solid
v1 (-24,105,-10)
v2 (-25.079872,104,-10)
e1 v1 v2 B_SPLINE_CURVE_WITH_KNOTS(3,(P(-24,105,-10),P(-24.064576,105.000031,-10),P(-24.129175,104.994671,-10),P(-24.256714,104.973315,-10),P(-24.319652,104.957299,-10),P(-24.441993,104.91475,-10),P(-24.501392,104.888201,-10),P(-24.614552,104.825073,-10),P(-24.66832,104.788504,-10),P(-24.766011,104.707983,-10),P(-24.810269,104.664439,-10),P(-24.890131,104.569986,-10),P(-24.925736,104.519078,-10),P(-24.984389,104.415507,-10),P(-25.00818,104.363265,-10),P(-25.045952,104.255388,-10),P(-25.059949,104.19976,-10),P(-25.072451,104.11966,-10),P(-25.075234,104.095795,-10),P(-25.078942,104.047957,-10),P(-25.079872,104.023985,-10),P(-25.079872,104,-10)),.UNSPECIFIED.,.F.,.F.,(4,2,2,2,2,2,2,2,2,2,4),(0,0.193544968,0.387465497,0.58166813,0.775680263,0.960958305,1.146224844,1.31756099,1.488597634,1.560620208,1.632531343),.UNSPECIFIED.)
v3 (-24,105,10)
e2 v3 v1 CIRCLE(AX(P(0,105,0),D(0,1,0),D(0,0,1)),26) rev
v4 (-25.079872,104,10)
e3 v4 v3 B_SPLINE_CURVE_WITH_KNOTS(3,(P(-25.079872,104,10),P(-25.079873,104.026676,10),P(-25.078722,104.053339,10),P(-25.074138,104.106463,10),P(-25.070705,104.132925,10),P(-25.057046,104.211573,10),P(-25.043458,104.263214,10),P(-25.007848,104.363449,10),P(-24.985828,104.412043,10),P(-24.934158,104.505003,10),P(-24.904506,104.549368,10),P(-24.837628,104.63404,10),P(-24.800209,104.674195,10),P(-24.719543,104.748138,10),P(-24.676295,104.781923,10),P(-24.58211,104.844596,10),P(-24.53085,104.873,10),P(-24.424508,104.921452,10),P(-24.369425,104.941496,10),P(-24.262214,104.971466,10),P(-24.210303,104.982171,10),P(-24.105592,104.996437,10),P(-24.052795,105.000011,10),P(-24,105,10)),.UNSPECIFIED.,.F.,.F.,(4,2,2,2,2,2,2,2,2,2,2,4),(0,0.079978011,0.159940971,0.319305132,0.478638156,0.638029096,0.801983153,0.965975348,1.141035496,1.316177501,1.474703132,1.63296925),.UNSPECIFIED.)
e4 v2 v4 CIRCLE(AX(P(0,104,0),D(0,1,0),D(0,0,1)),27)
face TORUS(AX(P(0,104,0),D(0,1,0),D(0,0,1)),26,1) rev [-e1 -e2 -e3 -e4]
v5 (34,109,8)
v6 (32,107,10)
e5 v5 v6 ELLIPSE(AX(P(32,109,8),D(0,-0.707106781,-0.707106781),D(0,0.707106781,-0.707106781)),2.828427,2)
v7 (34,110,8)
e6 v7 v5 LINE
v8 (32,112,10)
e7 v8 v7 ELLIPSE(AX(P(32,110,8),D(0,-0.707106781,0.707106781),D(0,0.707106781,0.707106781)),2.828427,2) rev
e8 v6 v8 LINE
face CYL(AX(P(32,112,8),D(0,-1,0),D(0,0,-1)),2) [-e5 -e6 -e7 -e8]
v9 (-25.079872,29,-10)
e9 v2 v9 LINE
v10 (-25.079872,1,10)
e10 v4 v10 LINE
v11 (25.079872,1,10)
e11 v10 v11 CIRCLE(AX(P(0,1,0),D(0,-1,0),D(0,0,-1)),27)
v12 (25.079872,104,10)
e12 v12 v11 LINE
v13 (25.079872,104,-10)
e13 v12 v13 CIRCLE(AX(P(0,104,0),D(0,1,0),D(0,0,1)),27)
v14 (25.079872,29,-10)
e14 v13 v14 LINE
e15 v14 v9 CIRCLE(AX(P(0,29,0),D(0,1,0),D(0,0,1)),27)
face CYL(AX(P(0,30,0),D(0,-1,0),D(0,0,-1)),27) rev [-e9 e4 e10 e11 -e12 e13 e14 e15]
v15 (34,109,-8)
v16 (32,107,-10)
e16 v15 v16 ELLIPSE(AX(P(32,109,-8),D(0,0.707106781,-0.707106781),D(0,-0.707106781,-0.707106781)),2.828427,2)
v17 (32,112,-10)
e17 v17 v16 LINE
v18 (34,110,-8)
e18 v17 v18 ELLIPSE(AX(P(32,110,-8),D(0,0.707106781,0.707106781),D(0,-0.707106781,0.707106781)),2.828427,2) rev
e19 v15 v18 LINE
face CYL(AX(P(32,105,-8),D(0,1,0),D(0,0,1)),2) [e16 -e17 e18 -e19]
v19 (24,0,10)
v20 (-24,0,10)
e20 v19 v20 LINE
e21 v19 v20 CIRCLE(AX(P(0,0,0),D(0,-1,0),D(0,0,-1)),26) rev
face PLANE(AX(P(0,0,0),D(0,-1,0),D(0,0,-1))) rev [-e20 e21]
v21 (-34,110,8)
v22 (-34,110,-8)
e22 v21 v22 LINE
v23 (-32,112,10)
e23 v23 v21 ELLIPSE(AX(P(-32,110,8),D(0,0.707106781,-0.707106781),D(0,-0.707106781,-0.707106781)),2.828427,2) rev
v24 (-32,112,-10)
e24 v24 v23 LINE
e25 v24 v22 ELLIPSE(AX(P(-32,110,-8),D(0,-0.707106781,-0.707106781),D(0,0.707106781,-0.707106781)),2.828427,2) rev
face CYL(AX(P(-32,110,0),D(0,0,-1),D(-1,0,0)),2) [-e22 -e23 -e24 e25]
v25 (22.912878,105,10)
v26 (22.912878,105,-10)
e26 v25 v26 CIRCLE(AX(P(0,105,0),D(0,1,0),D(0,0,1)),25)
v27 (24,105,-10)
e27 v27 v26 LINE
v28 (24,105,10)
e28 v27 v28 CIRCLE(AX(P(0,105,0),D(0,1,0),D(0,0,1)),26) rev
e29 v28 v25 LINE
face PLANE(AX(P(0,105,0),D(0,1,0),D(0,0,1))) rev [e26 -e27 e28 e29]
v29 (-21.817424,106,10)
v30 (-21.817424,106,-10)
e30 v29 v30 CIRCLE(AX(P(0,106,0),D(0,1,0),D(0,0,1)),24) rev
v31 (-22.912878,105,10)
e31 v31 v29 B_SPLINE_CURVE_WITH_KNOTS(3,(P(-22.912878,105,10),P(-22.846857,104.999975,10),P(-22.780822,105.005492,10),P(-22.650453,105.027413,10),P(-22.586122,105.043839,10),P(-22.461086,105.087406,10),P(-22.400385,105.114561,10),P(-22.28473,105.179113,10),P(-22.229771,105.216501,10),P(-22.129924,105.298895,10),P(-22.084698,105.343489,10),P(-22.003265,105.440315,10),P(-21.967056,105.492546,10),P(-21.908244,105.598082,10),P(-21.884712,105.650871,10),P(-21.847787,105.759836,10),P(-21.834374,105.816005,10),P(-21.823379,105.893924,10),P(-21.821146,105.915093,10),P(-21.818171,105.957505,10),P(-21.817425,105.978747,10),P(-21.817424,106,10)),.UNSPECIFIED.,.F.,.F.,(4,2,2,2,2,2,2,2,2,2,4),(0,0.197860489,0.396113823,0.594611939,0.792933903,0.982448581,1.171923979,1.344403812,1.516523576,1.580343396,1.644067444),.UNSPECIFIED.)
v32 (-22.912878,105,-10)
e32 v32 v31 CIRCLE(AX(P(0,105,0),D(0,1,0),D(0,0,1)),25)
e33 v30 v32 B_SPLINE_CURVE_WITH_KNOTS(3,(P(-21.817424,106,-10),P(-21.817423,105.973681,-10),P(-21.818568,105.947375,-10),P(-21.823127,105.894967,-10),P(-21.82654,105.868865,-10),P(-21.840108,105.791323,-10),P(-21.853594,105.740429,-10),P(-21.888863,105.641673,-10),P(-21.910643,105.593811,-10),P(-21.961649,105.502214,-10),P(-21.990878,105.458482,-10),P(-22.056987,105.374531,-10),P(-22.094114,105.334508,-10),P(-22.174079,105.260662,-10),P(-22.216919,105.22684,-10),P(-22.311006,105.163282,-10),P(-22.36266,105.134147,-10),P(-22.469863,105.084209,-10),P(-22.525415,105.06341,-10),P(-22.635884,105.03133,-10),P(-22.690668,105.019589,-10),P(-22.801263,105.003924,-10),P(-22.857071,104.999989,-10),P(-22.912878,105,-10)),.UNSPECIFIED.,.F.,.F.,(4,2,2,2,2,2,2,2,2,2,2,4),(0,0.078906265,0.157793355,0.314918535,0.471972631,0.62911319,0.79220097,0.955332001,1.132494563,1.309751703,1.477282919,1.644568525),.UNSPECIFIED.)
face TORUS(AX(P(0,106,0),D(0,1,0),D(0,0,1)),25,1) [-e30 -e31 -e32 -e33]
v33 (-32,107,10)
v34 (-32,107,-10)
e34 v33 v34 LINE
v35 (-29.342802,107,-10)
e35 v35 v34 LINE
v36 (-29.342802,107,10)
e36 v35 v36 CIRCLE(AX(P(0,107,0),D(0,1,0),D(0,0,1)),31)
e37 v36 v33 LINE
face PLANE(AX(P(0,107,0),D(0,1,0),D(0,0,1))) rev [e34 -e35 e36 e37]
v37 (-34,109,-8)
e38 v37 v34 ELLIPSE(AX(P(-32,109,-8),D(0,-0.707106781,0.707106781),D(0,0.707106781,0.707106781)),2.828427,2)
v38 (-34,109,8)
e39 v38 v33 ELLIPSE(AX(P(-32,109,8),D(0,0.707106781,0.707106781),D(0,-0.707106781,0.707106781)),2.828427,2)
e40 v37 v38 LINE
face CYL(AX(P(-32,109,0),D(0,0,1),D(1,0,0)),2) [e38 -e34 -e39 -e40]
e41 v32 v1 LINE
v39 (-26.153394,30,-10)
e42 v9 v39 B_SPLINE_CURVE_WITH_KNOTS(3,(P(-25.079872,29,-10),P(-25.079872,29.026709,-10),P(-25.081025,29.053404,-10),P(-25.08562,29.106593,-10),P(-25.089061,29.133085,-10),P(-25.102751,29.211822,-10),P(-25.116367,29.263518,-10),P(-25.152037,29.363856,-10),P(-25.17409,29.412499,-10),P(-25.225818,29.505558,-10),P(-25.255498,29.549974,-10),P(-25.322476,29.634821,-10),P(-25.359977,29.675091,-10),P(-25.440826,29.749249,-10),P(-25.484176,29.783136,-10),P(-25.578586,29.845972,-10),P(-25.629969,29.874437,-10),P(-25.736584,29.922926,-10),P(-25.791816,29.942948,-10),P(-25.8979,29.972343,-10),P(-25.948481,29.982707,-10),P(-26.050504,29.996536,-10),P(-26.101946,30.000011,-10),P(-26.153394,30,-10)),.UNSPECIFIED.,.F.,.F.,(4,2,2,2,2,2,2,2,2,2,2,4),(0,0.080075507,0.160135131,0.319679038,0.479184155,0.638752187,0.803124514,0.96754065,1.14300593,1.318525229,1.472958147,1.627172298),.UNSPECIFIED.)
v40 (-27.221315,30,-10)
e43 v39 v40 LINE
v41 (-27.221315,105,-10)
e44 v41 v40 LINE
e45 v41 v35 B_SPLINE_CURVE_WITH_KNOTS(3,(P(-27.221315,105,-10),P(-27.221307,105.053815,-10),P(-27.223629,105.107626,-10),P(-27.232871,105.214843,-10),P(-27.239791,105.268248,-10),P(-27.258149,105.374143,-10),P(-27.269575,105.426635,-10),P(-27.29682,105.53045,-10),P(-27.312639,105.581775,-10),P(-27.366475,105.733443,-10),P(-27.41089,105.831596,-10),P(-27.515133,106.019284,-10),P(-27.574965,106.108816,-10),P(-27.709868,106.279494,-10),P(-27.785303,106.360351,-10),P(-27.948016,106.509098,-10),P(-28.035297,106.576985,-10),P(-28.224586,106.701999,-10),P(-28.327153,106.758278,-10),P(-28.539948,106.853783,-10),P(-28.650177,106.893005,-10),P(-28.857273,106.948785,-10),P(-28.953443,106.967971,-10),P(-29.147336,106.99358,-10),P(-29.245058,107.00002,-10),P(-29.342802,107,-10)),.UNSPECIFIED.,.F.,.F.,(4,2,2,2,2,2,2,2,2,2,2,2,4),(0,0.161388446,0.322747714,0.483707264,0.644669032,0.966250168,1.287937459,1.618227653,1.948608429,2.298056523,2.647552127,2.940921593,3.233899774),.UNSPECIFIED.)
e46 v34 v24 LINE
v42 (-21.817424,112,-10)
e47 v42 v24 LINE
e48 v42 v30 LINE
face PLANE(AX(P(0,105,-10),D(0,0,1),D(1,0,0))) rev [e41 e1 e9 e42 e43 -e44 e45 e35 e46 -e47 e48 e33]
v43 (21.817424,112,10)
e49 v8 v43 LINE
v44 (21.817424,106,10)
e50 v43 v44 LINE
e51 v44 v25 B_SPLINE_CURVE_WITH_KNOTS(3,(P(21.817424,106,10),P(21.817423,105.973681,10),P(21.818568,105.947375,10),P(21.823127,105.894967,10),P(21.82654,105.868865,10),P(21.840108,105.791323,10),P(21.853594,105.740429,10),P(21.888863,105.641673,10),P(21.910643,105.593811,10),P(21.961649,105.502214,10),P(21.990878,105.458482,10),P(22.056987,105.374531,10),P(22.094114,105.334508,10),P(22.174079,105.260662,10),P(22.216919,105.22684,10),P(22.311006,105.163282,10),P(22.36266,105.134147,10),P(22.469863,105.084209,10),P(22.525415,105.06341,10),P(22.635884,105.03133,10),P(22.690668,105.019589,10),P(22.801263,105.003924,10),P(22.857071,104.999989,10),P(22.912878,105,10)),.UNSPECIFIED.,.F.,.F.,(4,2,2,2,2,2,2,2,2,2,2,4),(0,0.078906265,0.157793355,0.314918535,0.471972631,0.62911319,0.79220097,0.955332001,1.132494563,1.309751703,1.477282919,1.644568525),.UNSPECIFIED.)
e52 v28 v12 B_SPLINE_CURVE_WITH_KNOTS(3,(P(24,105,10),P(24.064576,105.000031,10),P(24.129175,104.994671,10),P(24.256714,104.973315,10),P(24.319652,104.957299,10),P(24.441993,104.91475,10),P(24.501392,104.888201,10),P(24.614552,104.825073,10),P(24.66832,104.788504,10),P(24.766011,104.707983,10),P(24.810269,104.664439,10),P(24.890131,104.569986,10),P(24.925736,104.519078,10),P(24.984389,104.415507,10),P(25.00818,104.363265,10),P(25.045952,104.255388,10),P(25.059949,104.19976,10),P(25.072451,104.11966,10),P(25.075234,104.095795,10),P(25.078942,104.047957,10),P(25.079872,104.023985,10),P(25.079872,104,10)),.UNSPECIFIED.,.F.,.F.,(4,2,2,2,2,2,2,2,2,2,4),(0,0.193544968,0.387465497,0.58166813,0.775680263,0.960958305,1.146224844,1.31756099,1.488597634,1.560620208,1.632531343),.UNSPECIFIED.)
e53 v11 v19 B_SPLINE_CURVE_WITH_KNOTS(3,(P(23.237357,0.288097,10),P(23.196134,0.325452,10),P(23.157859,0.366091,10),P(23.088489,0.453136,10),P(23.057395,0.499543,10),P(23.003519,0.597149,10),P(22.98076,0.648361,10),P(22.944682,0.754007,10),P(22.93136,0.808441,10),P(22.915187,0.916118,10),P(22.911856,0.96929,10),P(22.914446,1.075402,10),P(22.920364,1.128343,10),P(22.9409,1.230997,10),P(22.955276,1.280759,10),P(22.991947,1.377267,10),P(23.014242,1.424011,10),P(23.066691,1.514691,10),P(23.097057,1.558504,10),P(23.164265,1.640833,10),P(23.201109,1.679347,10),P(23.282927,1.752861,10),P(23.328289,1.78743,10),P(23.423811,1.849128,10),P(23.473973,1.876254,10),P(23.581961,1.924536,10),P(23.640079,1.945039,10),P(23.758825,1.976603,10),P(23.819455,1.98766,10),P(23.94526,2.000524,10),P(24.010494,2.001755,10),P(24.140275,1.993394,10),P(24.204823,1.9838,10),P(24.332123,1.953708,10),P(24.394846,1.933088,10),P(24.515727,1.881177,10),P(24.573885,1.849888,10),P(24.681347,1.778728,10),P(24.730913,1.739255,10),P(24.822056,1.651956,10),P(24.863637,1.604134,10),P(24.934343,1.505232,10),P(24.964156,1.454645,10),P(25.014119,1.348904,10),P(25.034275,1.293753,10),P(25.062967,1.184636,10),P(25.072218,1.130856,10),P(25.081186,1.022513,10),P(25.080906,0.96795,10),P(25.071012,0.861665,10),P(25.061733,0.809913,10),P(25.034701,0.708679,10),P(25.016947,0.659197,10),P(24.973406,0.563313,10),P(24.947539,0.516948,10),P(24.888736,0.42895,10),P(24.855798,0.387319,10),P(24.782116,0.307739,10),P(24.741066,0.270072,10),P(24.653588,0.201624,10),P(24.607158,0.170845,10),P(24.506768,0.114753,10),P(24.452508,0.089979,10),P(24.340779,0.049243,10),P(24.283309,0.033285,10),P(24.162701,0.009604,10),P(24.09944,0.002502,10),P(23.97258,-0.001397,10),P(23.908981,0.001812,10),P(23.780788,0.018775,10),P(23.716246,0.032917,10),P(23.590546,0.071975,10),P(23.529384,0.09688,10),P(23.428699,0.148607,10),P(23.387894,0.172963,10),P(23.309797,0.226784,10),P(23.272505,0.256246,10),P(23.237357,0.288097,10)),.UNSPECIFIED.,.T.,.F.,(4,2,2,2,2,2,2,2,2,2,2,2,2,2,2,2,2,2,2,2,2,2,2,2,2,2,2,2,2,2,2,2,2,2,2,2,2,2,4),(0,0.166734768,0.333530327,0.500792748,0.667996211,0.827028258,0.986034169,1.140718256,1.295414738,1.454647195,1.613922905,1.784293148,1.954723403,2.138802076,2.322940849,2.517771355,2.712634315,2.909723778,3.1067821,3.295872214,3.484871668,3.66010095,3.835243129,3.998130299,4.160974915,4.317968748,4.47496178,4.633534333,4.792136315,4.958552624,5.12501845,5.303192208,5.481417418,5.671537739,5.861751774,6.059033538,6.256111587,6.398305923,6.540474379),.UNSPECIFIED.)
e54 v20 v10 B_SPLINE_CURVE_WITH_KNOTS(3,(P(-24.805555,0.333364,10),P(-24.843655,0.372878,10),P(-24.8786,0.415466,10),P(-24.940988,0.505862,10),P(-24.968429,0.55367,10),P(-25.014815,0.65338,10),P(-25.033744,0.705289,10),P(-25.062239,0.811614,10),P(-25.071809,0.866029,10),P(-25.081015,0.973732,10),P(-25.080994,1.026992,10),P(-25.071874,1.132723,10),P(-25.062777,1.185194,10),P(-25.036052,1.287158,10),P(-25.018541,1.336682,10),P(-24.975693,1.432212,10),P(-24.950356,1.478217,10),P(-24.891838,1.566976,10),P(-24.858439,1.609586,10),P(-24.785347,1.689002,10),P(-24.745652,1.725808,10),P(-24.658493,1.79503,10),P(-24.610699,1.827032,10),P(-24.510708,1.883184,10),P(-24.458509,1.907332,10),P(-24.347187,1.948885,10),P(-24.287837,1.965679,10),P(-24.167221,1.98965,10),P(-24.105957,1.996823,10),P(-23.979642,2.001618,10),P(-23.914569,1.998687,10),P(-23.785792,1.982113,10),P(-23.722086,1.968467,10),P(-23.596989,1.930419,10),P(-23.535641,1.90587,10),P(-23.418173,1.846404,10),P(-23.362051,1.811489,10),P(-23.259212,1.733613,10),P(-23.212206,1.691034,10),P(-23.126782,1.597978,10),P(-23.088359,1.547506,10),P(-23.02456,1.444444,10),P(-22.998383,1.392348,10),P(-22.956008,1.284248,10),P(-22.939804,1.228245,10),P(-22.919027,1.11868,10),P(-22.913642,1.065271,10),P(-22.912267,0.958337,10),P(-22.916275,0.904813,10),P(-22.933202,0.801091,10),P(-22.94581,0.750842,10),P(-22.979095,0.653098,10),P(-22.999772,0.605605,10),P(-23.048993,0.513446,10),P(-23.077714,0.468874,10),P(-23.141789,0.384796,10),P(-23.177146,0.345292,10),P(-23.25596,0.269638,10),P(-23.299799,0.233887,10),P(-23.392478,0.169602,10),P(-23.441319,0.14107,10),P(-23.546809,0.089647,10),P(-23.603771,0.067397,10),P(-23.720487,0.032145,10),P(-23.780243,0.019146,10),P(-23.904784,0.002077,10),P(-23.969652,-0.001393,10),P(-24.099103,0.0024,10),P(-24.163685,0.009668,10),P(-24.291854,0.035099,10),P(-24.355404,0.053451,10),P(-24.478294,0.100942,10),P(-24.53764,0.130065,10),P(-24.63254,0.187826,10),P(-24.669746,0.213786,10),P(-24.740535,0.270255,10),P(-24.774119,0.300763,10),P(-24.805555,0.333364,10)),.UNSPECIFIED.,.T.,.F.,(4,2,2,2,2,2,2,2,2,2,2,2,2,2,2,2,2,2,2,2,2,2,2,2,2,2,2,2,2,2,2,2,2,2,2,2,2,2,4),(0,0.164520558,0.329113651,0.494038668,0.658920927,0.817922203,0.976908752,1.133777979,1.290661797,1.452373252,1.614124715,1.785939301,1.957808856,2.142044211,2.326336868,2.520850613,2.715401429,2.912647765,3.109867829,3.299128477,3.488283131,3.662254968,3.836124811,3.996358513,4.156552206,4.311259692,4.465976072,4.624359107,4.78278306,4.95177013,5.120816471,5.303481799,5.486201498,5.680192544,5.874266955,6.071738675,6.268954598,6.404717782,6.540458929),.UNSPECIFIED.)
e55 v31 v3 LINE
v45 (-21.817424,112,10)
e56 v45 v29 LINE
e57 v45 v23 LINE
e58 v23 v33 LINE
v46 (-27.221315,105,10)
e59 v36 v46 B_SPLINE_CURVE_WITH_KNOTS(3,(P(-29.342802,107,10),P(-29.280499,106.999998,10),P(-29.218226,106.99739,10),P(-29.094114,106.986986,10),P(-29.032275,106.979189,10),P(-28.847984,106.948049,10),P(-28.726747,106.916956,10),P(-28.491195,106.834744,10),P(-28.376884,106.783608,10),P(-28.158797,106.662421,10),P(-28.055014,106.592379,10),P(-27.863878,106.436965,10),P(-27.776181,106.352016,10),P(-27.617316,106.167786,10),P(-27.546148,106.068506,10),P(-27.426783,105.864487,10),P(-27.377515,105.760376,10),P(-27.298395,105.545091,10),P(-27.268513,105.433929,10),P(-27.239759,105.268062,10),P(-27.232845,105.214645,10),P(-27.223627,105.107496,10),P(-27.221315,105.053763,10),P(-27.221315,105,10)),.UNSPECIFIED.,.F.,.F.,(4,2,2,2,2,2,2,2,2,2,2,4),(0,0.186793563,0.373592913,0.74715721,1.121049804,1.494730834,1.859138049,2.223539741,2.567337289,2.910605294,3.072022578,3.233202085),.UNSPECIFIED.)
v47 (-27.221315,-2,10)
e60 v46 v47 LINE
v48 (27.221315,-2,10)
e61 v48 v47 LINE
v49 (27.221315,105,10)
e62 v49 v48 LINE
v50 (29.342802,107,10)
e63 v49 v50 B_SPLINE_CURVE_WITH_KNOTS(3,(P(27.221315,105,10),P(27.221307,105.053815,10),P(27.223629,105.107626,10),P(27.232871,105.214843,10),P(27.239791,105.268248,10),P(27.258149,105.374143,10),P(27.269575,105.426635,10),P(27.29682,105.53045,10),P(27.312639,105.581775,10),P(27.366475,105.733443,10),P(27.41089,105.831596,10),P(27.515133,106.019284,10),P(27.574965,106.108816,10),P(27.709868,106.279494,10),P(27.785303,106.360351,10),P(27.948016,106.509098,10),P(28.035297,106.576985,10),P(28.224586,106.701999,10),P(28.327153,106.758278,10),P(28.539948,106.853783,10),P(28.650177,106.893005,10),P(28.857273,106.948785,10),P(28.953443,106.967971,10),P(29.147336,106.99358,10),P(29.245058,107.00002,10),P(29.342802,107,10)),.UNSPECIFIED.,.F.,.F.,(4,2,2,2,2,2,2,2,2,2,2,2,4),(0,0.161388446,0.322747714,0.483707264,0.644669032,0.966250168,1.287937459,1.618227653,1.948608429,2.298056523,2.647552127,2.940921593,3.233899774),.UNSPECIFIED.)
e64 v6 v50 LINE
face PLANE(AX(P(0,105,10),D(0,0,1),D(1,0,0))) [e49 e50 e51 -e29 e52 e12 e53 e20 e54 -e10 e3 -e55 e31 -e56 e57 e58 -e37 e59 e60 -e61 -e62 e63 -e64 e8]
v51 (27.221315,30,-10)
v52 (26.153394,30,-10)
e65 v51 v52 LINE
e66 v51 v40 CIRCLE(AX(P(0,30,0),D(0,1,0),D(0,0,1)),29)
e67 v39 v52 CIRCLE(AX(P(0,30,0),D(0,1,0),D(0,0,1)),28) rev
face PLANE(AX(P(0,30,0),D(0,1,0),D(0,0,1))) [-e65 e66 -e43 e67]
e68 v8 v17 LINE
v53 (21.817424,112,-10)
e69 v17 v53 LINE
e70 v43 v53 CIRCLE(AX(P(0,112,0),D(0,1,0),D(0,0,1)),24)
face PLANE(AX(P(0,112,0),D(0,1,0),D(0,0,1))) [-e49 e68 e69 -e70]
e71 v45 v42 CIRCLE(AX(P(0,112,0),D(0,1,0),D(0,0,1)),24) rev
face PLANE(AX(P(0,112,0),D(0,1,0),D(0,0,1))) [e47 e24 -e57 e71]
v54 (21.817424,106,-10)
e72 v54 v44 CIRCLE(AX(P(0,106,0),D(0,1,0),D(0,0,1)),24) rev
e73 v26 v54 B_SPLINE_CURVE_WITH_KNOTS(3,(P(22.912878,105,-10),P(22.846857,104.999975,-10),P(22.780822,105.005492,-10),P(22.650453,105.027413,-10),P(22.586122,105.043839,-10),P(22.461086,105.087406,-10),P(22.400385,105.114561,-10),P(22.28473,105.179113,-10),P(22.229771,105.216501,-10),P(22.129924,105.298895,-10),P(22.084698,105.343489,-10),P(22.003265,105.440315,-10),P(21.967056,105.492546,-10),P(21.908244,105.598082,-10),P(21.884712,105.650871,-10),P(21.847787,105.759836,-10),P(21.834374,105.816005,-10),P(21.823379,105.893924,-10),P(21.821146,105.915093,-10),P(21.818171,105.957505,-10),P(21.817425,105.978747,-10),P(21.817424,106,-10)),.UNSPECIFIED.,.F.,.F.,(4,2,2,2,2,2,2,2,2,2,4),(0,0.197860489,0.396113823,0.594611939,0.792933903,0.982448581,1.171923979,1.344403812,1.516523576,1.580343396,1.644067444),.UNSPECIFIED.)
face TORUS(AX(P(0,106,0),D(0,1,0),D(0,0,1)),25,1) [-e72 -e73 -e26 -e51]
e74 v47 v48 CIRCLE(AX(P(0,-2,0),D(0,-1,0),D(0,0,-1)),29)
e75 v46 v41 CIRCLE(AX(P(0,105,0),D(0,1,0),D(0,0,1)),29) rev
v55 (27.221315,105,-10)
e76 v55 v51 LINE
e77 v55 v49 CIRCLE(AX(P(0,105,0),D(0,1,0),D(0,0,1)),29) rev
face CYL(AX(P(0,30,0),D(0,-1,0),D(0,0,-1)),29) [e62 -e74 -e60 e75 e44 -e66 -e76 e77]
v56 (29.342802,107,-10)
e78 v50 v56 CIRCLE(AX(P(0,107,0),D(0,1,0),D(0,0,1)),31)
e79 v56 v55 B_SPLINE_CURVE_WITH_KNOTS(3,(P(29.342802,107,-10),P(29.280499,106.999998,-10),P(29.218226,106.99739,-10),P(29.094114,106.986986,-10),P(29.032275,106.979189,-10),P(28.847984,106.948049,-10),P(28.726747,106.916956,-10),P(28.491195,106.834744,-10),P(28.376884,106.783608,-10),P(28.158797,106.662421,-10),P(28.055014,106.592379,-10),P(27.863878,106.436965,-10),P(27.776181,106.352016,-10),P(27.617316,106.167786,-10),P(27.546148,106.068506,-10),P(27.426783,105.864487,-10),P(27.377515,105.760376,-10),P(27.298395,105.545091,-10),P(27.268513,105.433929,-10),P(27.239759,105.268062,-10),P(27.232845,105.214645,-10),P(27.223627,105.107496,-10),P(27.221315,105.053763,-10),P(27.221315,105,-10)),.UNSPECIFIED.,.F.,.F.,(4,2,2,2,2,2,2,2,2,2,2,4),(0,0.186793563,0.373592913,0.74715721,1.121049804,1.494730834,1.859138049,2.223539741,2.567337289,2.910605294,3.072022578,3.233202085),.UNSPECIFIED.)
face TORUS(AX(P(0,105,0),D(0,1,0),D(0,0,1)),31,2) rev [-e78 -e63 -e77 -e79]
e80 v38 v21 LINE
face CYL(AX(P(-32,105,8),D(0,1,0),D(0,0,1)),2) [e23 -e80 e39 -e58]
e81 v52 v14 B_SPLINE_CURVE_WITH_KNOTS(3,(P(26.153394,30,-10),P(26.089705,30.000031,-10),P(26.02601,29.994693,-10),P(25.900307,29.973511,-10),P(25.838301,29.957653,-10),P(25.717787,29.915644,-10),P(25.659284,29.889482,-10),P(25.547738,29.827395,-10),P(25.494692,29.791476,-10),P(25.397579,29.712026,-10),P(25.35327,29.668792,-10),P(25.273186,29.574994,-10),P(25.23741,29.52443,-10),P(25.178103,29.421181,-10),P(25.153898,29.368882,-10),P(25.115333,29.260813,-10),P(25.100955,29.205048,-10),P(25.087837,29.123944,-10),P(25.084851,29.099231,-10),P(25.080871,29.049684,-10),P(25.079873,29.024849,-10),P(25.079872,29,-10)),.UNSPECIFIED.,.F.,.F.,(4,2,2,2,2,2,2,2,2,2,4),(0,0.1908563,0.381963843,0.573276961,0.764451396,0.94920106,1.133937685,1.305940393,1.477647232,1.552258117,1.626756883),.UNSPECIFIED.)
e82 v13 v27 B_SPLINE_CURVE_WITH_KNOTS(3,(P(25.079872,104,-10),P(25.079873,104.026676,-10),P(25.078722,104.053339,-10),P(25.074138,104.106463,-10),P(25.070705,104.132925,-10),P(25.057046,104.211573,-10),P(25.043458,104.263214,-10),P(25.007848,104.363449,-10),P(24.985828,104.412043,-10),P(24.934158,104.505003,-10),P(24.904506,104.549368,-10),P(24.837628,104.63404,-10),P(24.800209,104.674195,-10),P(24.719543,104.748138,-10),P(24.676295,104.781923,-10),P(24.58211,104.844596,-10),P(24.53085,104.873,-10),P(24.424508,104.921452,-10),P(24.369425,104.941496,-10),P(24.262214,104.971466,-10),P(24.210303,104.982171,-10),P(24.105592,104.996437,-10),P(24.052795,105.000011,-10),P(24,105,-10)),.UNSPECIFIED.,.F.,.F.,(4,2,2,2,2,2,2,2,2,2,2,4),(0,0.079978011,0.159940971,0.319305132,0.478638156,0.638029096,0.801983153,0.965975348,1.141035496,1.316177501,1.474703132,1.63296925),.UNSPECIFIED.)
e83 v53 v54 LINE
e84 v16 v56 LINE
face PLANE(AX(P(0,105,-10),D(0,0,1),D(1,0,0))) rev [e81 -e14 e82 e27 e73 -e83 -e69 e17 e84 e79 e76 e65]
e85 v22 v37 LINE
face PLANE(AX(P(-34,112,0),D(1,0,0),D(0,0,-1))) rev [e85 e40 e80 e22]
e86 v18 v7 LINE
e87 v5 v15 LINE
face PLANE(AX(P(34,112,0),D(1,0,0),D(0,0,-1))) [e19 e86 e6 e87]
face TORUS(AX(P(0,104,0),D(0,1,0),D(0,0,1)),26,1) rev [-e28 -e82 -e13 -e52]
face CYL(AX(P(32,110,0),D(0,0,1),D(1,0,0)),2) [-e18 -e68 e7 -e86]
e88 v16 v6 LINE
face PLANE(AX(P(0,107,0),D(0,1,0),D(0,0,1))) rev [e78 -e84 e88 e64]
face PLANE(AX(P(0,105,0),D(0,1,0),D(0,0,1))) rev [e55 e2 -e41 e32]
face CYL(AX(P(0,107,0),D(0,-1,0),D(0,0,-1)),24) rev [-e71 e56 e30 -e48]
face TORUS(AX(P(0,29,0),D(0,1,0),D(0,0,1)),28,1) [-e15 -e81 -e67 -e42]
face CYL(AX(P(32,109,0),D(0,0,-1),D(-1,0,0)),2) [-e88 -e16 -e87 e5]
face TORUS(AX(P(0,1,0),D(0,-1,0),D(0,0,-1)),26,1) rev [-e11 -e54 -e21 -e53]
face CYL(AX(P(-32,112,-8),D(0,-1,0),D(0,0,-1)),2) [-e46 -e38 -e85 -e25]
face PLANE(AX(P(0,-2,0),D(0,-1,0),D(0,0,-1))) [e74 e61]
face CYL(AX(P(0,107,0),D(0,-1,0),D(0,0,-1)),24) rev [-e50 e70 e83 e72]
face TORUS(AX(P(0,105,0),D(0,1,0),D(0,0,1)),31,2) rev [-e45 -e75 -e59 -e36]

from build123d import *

# Parameters (mm, degrees)
SKETCH1_R           = 29
SKETCH1_R_2         = 27
BOSS_EXTRUDE1_DEPTH = 30
BOSS_EXTRUDE2_START = 2
SKETCH2_R           = 29
BOSS_EXTRUDE2_DEPTH = 2
BOSS_EXTRUDE3_DEPTH = 75
BOSS_EXTRUDE5_DEPTH = 2
FILLET2_R           = 1
BOSS_EXTRUDE6_DEPTH = 5
FILLET3_R           = 2
SKETCH7_W           = 70
SKETCH7_H           = 116
CUT_EXTRUDE1_DEPTH  = 19


with BuildPart() as part:
    # Sketch1 → Boss-Extrude1 (new body)
    with BuildSketch(Plane(origin=(0, 0, 0), x_dir=(1, 0, 0), z_dir=(0, 1, 0))):
        with Locations(Location((0, 0, 0), (0, 0, 270))):
            Circle(SKETCH1_R)
        with Locations(Location((0, 0, 0), (0, 0, 270))):
            Circle(SKETCH1_R_2, mode=Mode.SUBTRACT)
    extrude(amount=BOSS_EXTRUDE1_DEPTH)

    # Sketch2 → Boss-Extrude2 (add)
    with BuildSketch(Plane.XZ.offset(BOSS_EXTRUDE2_START)):
        with Locations(Location((0, 0, 0), (0, 0, 270))):
            Circle(SKETCH2_R)
    extrude(amount=-BOSS_EXTRUDE2_DEPTH)

    # Sketch3 → Boss-Extrude3 (add)
    with BuildSketch(Plane(origin=(0, 30, 0), x_dir=(1, 0, 0), z_dir=(0, 1, 0))):
        with BuildLine():
            ThreePointArc((27.221315178, -10), (29, 0), (27.221315178, 10))
            Line((27.221315178, 10), (25.079872408, 10))
            ThreePointArc((25.079872408, 10), (27, 0), (25.079872408, -10))
            Line((25.079872408, -10), (27.221315178, -10))
        make_face()
        with BuildLine():
            Line((-25.079872408, 10), (-27.221315178, 10))
            ThreePointArc((-27.221315178, 10), (-29, 0), (-27.221315178, -10))
            Line((-27.221315178, -10), (-25.079872408, -10))
            ThreePointArc((-25.079872408, -10), (-27, 0), (-25.079872408, 10))
        make_face()
    extrude(amount=BOSS_EXTRUDE3_DEPTH)

    # Sketch4 → Boss-Extrude5 (add)
    with BuildSketch(Plane(origin=(0, 105, 0), x_dir=(1, 0, 0), z_dir=(0, 1, 0))):
        with BuildLine():
            ThreePointArc((25.079872408, -10), (27, 0), (25.079872408, 10))
            Line((25.079872408, 10), (21.817424229, 10))
            ThreePointArc((21.817424229, 10), (23.448008247, 5.117705467), (24, 0))
            ThreePointArc((24, 0), (23.448008247, -5.117705467), (21.817424229, -10))
            Line((21.817424229, -10), (25.079872408, -10))
        make_face()
        with BuildLine():
            ThreePointArc((25.079872408, 10), (27, 0), (25.079872408, -10))
            Line((25.079872408, -10), (27.221315178, -10))
            ThreePointArc((27.221315178, -10), (29, 0), (27.221315178, 10))
            Line((27.221315178, 10), (25.079872408, 10))
        make_face()
        with BuildLine():
            Line((-21.817424229, 10), (-27.221315178, 10))
            ThreePointArc((-27.221315178, 10), (-28.551866312, 5.078477145), (-29, 3.9e-08))
            ThreePointArc((-29, 3.9e-08), (-28.551866318, -5.078477108), (-27.221315178, -10))
            Line((-27.221315178, -10), (-21.817424229, -10))
            ThreePointArc((-21.817424229, -10), (-24, 0), (-21.817424229, 10))
        make_face()
    extrude(amount=BOSS_EXTRUDE5_DEPTH)

    # Fillet2
    # the kernel refuses this fillet: 1 mm, written as the material it adds along each edge
    with BuildSketch(Plane(origin=(0, 105, 0), x_dir=(0.8906566474761322, 0, -0.4546765183144792), z_dir=(-0.4546765183144792, 0, -0.8906566474761322))) as fillet2_piece_1_section:
        with BuildLine():
            CenterArc((27 - FILLET2_R, FILLET2_R), FILLET2_R, 270, 90)
            Line((27 - FILLET2_R, 0), (27, 0))
            Line((27, 0), (27, FILLET2_R))
        make_face()
    fillet2_piece_1 = revolve(axis=Axis((0, 105, 0), (0, -1, 0)), revolution_arc=54.088245562, mode=Mode.PRIVATE)
    fillet2_piece_1 = split(fillet2_piece_1, bisect_by=Plane(origin=(26.719378233, 104.719378233, 10), z_dir=(0, 0, -1)), keep=Keep.TOP, mode=Mode.PRIVATE)
    fillet2_piece_1 = split(fillet2_piece_1, bisect_by=Plane(origin=(26.719378233, 104.719378233, -10), z_dir=(0, 0, 1)), keep=Keep.TOP, mode=Mode.PRIVATE)
    add(fillet2_piece_1)
    with BuildSketch(Plane(origin=(0, 105, 0), x_dir=(-0.890656647476122, 0, 0.4546765183144991), z_dir=(0.4546765183144991, 0, 0.890656647476122))) as fillet2_piece_2_section:
        with BuildLine():
            CenterArc((27 - FILLET2_R, FILLET2_R), FILLET2_R, 270, 90)
            Line((27 - FILLET2_R, 0), (27, 0))
            Line((27, 0), (27, FILLET2_R))
        make_face()
    fillet2_piece_2 = revolve(axis=Axis((0, 105, 0), (0, -1, 0)), revolution_arc=54.088245562, mode=Mode.PRIVATE)
    fillet2_piece_2 = split(fillet2_piece_2, bisect_by=Plane(origin=(-26.719378233, 104.719378233, 10), z_dir=(0, 0, -1)), keep=Keep.TOP, mode=Mode.PRIVATE)
    fillet2_piece_2 = split(fillet2_piece_2, bisect_by=Plane(origin=(-26.719378233, 104.719378233, -10), z_dir=(0, 0, 1)), keep=Keep.TOP, mode=Mode.PRIVATE)
    add(fillet2_piece_2)
    with BuildSketch(Plane(origin=(0, 0, 0), x_dir=(0, 0, 1), z_dir=(-1, 0, 0))) as fillet2_piece_3:
        with BuildLine():
            CenterArc((27 - FILLET2_R, FILLET2_R), FILLET2_R, 270, 90)
            Line((27 - FILLET2_R, 0), (27, 0))
            Line((27, 0), (27, FILLET2_R))
        make_face()
    revolve(axis=Axis((0, 0, 0), (0, 1, 0)))
    # the kernel refuses this fillet: 1 mm, written as the material it takes off along each edge
    with BuildSketch(Plane(origin=(0, 30, 0), x_dir=(0.9591739549871109, 0, -0.28281676766836794), z_dir=(0.28281676766836794, 0, 0.9591739549871109))) as fillet2_2_piece_1_section:
        with BuildLine():
            CenterArc((27 + FILLET2_R, -FILLET2_R), FILLET2_R, 90, 90)
            Line((27, -FILLET2_R), (27, 0))
            Line((27, 0), (27 + FILLET2_R, 0))
        make_face()
    fillet2_2_piece_1 = revolve(axis=Axis((0, 30, 0), (0, 1, 0)), revolution_arc=147.143219234, mode=Mode.PRIVATE)
    fillet2_2_piece_1 = split(fillet2_2_piece_1, bisect_by=Plane(origin=(0, 29.725140897, -10), z_dir=(0, 0, -1)), keep=Keep.TOP, mode=Mode.PRIVATE)
    add(fillet2_2_piece_1, mode=Mode.SUBTRACT)
    with BuildSketch(Plane(origin=(0, 30, 0), x_dir=(-0.9591557890892681, 0, 0.28287837007545047), z_dir=(-0.28287837007545047, 0, -0.9591557890892681))) as fillet2_2_piece_2_section:
        with BuildLine():
            CenterArc((27 + FILLET2_R, -FILLET2_R), FILLET2_R, 90, 90)
            Line((27, -FILLET2_R), (27, 0))
            Line((27, 0), (27 + FILLET2_R, 0))
        make_face()
    fillet2_2_piece_2 = revolve(axis=Axis((0, 30, 0), (0, 1, 0)), revolution_arc=73.567929793, mode=Mode.PRIVATE)
    fillet2_2_piece_2 = split(fillet2_2_piece_2, bisect_by=Plane(origin=(-15.465500951, 29.721420389, 10), z_dir=(0, 0, 1)), keep=Keep.TOP, mode=Mode.PRIVATE)
    add(fillet2_2_piece_2, mode=Mode.SUBTRACT)
    with BuildSketch(Plane(origin=(0, 105, 0), x_dir=(0.8608011340646036, 0, -0.5089414579232981), z_dir=(-0.5089414579232981, 0, -0.8608011340646036))) as fillet2_2_piece_3:
        with BuildLine():
            CenterArc((24 + FILLET2_R, -FILLET2_R), FILLET2_R, 90, 90)
            Line((24 + FILLET2_R, 0), (24, 0))
            Line((24, 0), (24, -FILLET2_R))
        make_face()
    revolve(axis=Axis((0, 105, 0), (0, -1, 0)), revolution_arc=61.186692958, mode=Mode.SUBTRACT)
    with BuildSketch(Plane(origin=(0, 105, 0), x_dir=(-0.860801134064602, 0, 0.5089414579233009), z_dir=(0.5089414579233009, 0, 0.860801134064602))) as fillet2_2_piece_4:
        with BuildLine():
            CenterArc((24 + FILLET2_R, -FILLET2_R), FILLET2_R, 90, 90)
            Line((24 + FILLET2_R, 0), (24, 0))
            Line((24, 0), (24, -FILLET2_R))
        make_face()
    revolve(axis=Axis((0, 105, 0), (0, -1, 0)), revolution_arc=61.186692958, mode=Mode.SUBTRACT)
    with BuildSketch(Plane(origin=(0, 30, 0), x_dir=(0, 0, 1), z_dir=(-1, 0, 0))) as fillet2_2_piece_5_section:
        with BuildLine():
            CenterArc((27 + FILLET2_R, -FILLET2_R), FILLET2_R, 90, 90)
            Line((27, -FILLET2_R), (27, 0))
            Line((27, 0), (27 + FILLET2_R, 0))
        make_face()
    fillet2_2_piece_5 = revolve(axis=Axis((0, 30, 0), (0, 1, 0)), revolution_arc=73.567929793, mode=Mode.PRIVATE)
    fillet2_2_piece_5 = split(fillet2_2_piece_5, bisect_by=Plane(origin=(15.465500935, 29.721420416, 10), z_dir=(0, 0, 1)), keep=Keep.TOP, mode=Mode.PRIVATE)
    add(fillet2_2_piece_5, mode=Mode.SUBTRACT)

    # Sketch6 → Boss-Extrude6 (add)
    with BuildSketch(Plane(origin=(0, 107, 0), x_dir=(1, 0, 0), z_dir=(0, 1, 0))):
        with BuildLine():
            ThreePointArc((-27.221315178, -10), (-29, 0), (-27.221315178, 10))
            Line((-27.221315178, 10), (-34, 10))
            Line((-34, 10), (-34, -10))
            Line((-34, -10), (-27.221315178, -10))
        make_face()
        with BuildLine():
            Line((-27.221315178, -10), (-21.817424229, -10))
            ThreePointArc((-21.817424229, -10), (-24, 0), (-21.817424229, 10))
            Line((-21.817424229, 10), (-27.221315178, 10))
            ThreePointArc((-27.221315178, 10), (-29, 0), (-27.221315178, -10))
        make_face()
        with BuildLine():
            Line((34, 10), (21.817424229, 10))
            ThreePointArc((21.817424229, 10), (23.448008247, 5.117705467), (24, 0))
            ThreePointArc((24, 0), (23.448008247, -5.117705467), (21.817424229, -10))
            Line((21.817424229, -10), (34, -10))
            Line((34, -10), (34, 10))
        make_face()
    extrude(amount=BOSS_EXTRUDE6_DEPTH)

    # Fillet3
    # the kernel refuses this fillet: 2 mm, written as the material it adds along each edge
    with BuildSketch(Plane(origin=(0, 107, 0), x_dir=(0.8655830504384638, 0, 0.5007653969611356), z_dir=(-0.5007653969611356, 0, 0.8655830504384638))) as fillet3_piece_1_section:
        with BuildLine():
            CenterArc((29 + FILLET3_R, -FILLET3_R), FILLET3_R, 90, 90)
            Line((29 + FILLET3_R, 0), (29, 0))
            Line((29, 0), (29, -FILLET3_R))
        make_face()
    fillet3_piece_1 = revolve(axis=Axis((0, 107, 0), (0, 1, 0)), revolution_arc=60.101302376, mode=Mode.PRIVATE)
    fillet3_piece_1 = split(fillet3_piece_1, bisect_by=Plane(origin=(29.566335582, 106.433664418, -10), z_dir=(0, 0, 1)), keep=Keep.TOP, mode=Mode.PRIVATE)
    fillet3_piece_1 = split(fillet3_piece_1, bisect_by=Plane(origin=(29.566335582, 106.433664418, 10), z_dir=(0, 0, -1)), keep=Keep.TOP, mode=Mode.PRIVATE)
    add(fillet3_piece_1)
    with BuildSketch(Plane(origin=(0, 107, 0), x_dir=(-0.8655830504384671, 0, 0.5007653969611302), z_dir=(0.5007653969611302, 0, 0.8655830504384671))) as fillet3_piece_2_section:
        with BuildLine():
            CenterArc((29 + FILLET3_R, FILLET3_R), FILLET3_R, 180, 90)
            Line((29 + FILLET3_R, 0), (29, 0))
            Line((29, 0), (29, FILLET3_R))
        make_face()
    fillet3_piece_2 = revolve(axis=Axis((0, 107, 0), (0, -1, 0)), revolution_arc=60.101302376, mode=Mode.PRIVATE)
    fillet3_piece_2 = split(fillet3_piece_2, bisect_by=Plane(origin=(-29.566335582, 106.433664418, 10), z_dir=(0, 0, -1)), keep=Keep.TOP, mode=Mode.PRIVATE)
    fillet3_piece_2 = split(fillet3_piece_2, bisect_by=Plane(origin=(-29.566335582, 106.433664418, -10), z_dir=(0, 0, 1)), keep=Keep.TOP, mode=Mode.PRIVATE)
    add(fillet3_piece_2)
    # the kernel refuses this fillet: 2 mm, written as the material it takes off along each edge
    with BuildSketch(Plane(origin=(-34, 107, -15), x_dir=(0, 1, 0), z_dir=(0, 0, 1)), Plane(origin=(34, 107, 15), x_dir=(0, 1, 0), z_dir=(0, 0, -1))) as fillet3_2_piece_1:
        with BuildLine():
            CenterArc((FILLET3_R, -FILLET3_R), FILLET3_R, 90, 90)
            Line((0, -FILLET3_R), (0, 0))
            Line((0, 0), (FILLET3_R, 0))
        make_face()
    extrude(amount=30, mode=Mode.SUBTRACT)
    with BuildSketch(Plane(origin=(-34, 102, -10), x_dir=(0, 0, 1), z_dir=(0, 1, 0)), Plane(origin=(-34, 102, 10), x_dir=(1, 0, 0), z_dir=(0, 1, 0)), Plane(origin=(34, 102, 10), x_dir=(0, 0, -1), z_dir=(0, 1, 0)), Plane(origin=(34, 102, -10), x_dir=(-1, 0, 0), z_dir=(0, 1, 0))) as fillet3_2_piece_2:
        with BuildLine():
            CenterArc((FILLET3_R, FILLET3_R), FILLET3_R, 180, 90)
            Line((0, FILLET3_R), (0, 0))
            Line((0, 0), (FILLET3_R, 0))
        make_face()
    extrude(amount=15, mode=Mode.SUBTRACT)
    with BuildSketch(Plane(origin=(-34, 112, -15), x_dir=(0, -1, 0), z_dir=(0, 0, 1)), Plane(origin=(34, 112, 15), x_dir=(0, -1, 0), z_dir=(0, 0, -1))) as fillet3_2_piece_3:
        with BuildLine():
            CenterArc((FILLET3_R, FILLET3_R), FILLET3_R, 180, 90)
            Line((0, FILLET3_R), (0, 0))
            Line((0, 0), (FILLET3_R, 0))
        make_face()
    extrude(amount=30, mode=Mode.SUBTRACT)

    # Sketch7 → Cut-Extrude1 (cut)
    with BuildSketch(Plane.XY.offset(29)):
        with Locations((0, 55)):
            Rectangle(SKETCH7_W, SKETCH7_H)
    extrude(amount=-CUT_EXTRUDE1_DEPTH, mode=Mode.SUBTRACT)


solid = part.part
